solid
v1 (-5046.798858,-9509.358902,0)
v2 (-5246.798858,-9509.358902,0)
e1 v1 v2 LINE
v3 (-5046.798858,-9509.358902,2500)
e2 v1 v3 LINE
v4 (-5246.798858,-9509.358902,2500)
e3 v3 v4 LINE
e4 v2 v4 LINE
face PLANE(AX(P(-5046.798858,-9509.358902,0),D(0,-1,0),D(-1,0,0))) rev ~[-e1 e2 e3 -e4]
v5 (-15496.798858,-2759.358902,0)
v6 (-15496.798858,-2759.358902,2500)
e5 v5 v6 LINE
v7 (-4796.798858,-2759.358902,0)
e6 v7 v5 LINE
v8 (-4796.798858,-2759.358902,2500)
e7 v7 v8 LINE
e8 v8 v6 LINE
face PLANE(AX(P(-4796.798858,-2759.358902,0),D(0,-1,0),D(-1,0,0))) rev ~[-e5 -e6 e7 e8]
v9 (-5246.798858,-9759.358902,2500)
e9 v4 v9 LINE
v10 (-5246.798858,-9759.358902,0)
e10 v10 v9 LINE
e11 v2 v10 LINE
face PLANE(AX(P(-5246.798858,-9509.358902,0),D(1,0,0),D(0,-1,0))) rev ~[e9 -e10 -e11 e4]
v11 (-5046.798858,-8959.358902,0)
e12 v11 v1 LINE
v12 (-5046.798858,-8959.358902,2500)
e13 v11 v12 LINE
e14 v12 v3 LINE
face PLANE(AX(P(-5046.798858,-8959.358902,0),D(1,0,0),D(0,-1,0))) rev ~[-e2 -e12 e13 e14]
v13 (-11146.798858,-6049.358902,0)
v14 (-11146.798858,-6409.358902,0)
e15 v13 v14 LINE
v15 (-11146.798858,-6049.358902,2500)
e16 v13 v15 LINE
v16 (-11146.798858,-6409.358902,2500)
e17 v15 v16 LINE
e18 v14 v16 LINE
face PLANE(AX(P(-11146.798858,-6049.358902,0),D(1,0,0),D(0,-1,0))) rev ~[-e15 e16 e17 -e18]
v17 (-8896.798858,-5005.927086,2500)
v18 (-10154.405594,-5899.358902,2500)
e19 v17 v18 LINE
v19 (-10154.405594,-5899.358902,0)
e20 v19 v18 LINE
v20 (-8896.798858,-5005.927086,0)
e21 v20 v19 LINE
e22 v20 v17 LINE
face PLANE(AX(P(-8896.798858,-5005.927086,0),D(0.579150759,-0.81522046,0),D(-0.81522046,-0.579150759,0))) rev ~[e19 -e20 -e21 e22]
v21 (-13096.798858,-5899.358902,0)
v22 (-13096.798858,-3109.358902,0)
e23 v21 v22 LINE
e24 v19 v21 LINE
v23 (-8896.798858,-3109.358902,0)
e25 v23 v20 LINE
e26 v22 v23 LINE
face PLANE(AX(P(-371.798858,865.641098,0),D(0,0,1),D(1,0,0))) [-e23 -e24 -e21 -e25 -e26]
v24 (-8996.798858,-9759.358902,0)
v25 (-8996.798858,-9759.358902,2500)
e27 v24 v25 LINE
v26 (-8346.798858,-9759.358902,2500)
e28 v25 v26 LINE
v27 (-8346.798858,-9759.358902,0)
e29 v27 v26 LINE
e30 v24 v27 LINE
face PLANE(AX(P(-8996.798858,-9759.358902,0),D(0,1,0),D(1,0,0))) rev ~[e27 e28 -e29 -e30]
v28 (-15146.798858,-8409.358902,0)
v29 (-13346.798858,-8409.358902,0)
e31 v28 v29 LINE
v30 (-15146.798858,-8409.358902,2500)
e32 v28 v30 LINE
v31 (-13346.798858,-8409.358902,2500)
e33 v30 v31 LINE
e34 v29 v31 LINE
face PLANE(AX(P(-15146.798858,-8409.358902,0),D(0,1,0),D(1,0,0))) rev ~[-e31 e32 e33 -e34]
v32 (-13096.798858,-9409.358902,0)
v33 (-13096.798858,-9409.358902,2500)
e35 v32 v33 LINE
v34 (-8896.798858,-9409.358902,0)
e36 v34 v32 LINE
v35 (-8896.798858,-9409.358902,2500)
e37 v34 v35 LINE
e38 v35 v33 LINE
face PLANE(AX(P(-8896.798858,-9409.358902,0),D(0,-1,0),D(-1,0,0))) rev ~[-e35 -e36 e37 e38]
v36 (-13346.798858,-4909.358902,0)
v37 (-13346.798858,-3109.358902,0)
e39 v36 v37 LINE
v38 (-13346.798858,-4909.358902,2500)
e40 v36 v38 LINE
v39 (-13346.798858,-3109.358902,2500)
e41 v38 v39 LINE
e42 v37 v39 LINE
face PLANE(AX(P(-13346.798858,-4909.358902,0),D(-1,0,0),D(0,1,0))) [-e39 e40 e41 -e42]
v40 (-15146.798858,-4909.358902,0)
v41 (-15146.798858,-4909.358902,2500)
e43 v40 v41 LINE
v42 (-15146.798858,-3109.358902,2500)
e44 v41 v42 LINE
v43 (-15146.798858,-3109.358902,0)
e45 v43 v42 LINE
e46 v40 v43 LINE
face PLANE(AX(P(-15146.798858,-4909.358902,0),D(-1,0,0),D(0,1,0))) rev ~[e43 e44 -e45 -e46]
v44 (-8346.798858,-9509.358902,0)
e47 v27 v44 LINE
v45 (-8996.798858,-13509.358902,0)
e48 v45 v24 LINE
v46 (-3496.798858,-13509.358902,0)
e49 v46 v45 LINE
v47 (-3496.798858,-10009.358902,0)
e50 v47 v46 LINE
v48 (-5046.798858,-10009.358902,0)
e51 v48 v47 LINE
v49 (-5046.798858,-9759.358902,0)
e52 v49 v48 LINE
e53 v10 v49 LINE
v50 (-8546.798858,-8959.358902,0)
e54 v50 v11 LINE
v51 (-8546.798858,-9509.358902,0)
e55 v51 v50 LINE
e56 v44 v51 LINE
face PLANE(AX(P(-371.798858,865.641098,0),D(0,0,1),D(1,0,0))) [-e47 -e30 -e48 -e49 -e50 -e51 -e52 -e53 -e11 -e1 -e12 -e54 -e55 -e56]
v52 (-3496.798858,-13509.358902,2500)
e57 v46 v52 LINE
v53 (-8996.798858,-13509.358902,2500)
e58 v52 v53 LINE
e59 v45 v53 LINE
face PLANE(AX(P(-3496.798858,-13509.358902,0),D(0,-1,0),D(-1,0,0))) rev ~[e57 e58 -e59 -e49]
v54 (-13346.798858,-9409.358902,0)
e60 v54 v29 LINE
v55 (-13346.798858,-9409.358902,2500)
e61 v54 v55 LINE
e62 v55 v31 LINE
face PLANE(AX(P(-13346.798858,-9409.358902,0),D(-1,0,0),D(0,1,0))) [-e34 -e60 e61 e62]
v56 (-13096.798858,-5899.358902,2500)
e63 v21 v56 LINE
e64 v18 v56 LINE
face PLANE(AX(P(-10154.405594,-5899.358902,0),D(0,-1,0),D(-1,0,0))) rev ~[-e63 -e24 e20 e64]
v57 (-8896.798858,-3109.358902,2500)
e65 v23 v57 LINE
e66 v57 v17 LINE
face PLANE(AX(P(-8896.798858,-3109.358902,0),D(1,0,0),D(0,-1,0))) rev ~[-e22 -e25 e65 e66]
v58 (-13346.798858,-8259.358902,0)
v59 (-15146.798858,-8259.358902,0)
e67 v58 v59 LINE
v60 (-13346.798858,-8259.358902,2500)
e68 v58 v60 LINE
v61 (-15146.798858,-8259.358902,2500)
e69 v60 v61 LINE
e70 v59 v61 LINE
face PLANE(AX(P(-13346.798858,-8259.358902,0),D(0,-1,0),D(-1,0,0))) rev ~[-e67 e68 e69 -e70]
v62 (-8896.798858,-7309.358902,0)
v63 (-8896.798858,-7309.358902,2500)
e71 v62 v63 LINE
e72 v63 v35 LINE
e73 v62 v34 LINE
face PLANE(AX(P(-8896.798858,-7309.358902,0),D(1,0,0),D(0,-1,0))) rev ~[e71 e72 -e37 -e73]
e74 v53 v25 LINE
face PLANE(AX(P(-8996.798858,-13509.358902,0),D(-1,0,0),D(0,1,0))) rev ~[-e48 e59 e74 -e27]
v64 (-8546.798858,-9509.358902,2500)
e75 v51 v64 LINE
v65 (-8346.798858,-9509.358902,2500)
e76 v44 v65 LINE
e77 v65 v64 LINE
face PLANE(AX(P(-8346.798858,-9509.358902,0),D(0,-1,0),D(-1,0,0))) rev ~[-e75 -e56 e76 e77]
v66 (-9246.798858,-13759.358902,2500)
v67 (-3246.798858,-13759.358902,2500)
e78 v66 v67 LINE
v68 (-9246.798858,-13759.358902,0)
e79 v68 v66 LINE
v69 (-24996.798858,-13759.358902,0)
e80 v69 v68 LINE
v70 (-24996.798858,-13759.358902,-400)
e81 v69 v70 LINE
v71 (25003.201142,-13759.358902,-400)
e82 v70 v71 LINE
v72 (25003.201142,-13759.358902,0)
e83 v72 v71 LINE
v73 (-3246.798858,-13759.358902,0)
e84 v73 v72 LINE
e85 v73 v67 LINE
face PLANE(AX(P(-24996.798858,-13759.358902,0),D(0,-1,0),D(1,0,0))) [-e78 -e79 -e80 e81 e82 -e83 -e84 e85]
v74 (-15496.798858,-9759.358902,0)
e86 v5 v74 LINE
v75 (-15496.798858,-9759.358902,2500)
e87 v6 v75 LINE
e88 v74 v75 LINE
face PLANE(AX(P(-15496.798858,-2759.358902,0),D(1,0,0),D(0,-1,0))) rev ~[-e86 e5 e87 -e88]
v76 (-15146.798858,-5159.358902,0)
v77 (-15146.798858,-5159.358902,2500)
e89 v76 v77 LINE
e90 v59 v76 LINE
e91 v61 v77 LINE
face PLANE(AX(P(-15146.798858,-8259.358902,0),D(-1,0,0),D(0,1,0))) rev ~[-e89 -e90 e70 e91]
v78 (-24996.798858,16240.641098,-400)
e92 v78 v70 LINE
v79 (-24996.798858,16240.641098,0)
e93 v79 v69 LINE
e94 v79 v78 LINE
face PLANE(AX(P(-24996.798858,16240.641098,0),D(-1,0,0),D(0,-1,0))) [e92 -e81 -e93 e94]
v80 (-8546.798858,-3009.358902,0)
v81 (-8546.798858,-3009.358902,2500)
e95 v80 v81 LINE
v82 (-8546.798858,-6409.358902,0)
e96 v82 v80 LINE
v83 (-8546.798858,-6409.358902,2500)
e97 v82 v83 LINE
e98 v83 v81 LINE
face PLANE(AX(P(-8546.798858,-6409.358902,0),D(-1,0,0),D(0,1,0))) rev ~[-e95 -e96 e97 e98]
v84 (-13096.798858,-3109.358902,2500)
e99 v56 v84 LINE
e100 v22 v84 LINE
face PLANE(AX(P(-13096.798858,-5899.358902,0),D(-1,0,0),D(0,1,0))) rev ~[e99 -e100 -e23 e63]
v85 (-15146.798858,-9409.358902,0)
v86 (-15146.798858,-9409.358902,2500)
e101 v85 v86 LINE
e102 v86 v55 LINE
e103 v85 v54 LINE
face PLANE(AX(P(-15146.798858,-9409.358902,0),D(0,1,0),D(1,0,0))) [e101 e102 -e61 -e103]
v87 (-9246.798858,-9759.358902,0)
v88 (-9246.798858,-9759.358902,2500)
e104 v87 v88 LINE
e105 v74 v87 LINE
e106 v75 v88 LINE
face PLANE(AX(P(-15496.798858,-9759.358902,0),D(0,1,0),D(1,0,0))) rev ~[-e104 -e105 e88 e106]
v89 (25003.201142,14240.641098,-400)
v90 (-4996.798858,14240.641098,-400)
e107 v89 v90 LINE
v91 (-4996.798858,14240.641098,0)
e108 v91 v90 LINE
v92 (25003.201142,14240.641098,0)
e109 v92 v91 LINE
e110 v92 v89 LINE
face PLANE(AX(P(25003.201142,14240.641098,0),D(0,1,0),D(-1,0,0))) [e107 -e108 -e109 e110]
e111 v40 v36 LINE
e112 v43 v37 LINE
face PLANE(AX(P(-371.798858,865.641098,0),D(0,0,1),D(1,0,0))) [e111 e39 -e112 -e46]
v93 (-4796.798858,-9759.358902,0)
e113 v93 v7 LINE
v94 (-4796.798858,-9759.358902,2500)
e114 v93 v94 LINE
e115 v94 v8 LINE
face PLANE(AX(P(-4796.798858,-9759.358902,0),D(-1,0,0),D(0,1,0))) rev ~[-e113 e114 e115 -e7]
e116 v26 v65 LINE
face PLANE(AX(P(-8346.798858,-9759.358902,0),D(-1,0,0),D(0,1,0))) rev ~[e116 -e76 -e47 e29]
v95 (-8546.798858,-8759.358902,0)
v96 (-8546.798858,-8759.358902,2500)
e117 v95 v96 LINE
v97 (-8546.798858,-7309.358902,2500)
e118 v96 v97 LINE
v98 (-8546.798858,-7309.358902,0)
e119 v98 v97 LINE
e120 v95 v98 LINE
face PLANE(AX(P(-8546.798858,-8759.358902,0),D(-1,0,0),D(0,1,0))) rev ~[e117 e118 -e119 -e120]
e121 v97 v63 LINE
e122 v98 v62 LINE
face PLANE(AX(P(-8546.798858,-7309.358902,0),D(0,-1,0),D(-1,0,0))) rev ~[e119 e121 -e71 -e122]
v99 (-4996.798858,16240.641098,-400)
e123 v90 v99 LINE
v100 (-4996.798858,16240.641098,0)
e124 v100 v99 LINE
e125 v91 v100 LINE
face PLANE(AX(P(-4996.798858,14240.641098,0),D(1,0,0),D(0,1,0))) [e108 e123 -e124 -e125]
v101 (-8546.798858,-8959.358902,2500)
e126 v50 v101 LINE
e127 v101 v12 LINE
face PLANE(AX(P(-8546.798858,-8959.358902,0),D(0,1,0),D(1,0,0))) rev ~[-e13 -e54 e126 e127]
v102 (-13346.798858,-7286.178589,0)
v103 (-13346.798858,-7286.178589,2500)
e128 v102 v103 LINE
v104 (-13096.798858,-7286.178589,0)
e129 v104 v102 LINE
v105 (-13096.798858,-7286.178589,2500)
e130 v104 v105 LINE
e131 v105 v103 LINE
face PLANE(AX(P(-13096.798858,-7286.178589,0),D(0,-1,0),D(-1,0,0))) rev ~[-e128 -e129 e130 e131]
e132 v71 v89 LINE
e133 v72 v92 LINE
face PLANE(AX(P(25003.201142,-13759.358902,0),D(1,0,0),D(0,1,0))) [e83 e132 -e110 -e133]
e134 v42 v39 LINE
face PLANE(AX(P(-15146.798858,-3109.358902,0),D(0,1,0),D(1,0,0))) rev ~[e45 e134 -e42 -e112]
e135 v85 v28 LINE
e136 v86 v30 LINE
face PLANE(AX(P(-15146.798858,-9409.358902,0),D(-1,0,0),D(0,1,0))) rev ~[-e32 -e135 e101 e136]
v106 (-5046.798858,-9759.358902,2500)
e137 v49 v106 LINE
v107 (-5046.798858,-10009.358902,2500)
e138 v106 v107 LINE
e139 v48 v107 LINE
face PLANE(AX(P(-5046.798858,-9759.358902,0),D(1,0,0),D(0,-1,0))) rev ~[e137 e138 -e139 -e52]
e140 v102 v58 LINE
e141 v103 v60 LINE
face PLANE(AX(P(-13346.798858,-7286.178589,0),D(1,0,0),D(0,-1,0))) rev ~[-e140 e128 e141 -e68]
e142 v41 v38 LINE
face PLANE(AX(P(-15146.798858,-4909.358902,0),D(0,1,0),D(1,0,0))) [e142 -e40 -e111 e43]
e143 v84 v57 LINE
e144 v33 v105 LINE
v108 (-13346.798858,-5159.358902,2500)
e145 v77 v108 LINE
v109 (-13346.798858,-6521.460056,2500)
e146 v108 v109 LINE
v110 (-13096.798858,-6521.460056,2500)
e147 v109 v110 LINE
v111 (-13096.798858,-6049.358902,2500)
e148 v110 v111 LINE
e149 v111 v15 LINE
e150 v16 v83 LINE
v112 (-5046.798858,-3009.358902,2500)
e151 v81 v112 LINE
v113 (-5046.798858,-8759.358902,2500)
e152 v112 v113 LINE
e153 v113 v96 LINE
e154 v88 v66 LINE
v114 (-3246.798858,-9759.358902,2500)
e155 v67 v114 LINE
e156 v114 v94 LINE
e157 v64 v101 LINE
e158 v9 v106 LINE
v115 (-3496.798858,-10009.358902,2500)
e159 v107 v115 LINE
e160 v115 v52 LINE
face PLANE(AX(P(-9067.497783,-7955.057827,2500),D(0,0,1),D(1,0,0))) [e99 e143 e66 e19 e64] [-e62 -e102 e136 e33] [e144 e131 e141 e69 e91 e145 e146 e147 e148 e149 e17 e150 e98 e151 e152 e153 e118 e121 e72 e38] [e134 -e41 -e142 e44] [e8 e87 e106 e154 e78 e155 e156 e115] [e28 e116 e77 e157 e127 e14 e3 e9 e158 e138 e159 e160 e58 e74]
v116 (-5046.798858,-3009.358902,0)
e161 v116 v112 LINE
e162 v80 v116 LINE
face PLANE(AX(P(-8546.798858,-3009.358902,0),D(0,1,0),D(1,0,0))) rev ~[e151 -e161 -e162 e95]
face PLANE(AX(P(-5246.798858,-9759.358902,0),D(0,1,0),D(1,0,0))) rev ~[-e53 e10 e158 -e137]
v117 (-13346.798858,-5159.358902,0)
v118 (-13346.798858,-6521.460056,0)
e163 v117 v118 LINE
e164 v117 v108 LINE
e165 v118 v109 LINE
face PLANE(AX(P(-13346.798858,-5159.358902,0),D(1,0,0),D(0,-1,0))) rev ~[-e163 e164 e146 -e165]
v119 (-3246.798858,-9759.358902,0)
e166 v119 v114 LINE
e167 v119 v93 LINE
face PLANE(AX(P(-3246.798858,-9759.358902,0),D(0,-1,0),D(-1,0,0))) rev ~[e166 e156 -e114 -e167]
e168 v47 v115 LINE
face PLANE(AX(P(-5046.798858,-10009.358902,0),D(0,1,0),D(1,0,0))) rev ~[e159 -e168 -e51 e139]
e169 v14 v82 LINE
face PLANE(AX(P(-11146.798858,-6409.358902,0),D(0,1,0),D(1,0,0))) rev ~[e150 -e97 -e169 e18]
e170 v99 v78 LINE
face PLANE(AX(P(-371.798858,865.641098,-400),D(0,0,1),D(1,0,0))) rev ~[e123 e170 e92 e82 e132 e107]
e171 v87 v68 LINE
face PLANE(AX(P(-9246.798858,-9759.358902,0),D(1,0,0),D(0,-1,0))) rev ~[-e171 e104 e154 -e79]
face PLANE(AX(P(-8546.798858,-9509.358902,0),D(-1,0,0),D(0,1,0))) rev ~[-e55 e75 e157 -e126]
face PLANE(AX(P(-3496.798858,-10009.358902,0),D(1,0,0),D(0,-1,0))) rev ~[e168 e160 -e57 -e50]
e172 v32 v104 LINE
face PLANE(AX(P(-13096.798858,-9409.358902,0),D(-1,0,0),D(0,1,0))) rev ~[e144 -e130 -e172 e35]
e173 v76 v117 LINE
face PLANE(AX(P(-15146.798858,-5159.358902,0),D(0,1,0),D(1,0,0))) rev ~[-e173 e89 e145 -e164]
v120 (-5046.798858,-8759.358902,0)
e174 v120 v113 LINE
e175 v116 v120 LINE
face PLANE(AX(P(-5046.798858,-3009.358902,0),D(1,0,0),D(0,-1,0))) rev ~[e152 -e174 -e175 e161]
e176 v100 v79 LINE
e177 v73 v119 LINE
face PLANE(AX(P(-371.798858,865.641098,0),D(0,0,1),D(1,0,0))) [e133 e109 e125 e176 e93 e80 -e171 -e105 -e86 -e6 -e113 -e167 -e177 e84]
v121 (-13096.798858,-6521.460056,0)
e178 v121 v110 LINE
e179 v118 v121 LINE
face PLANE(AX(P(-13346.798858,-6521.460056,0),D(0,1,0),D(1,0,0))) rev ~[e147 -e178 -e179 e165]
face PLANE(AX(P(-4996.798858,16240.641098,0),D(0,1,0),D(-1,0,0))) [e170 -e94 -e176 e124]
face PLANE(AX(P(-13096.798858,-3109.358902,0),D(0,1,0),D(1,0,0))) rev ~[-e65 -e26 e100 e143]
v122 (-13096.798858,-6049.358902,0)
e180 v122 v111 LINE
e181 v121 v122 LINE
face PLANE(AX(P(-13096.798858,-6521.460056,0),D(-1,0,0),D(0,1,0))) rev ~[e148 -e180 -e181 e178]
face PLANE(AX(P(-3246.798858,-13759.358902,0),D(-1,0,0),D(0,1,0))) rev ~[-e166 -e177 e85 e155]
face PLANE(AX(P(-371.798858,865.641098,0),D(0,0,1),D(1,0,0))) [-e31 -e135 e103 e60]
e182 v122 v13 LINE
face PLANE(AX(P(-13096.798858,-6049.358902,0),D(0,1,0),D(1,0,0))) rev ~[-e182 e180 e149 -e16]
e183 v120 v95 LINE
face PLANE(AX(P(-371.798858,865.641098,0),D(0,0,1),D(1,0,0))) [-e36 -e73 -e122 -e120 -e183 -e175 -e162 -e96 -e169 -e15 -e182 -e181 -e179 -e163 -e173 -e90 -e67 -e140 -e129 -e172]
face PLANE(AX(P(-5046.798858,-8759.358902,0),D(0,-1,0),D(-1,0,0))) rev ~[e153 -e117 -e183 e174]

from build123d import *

# Parameters (mm, degrees)
F1_DEPTH = 400
F2_W     = 1800
F2_H     = 1000
F2_H_2   = 1800
F3_DEPTH = 2500


# Not quite as in the source:
# - a feature names something its author has since deleted; it is built from what else it names


with BuildPart() as f1:
    # F0 (on Top) → F1 (new body)
    with BuildSketch(Plane.XY):
        Polygon((-4996.7988580465, 16240.6410978539), (-24996.7988580465, 16240.6410978539), (-24996.7988580465, -13759.3589021461), (25003.2011419535, -13759.3589021461), (25003.2011419535, 14240.641097854), (-4996.7988580465, 14240.6410978539), align=None)
    extrude(amount=-F1_DEPTH)

    # F2 (on face) → F3 (join)
    with BuildSketch(Plane.XY):
        Polygon((-8546.7988580465, -2759.3589021461), (-15496.7988580465, -2759.3589021461), (-15496.7988580465, -9759.3589021461), (-9246.7988580465, -9759.3589021461), (-9246.7988580465, -13759.3589021461), (-3246.7988580465, -13759.3589021461), (-3246.7988580465, -9759.3589021461), (-4796.7988580465, -9759.3589021461), (-4796.7988580465, -3009.3589021461), (-4796.7988580465, -2759.3589021461), align=None)
        with Locations((-14246.7988580465, -8909.3589021461)):
            Rectangle(F2_W, F2_H, mode=Mode.SUBTRACT)
        Polygon((-8996.7988580465, -13509.3589021461), (-8996.7988580465, -9759.3589021461), (-8546.7988580465, -9759.3589021461), (-8346.7988580465, -9759.3589021461), (-8346.7988580465, -9509.3589021461), (-8546.7988580465, -9509.3589021461), (-8546.7988580465, -8959.3589021461), (-5046.7988580465, -8959.3589021461), (-5046.7988580465, -9509.3589021461), (-5246.7988580465, -9509.3589021461), (-5246.7988580465, -9759.3589021461), (-5046.7988580465, -9759.3589021461), (-5046.7988580465, -10009.3589021461), (-4796.7988580465, -10009.3589021461), (-3496.7988580465, -10009.3589021461), (-3496.7988580465, -13509.3589021461), align=None, mode=Mode.SUBTRACT)
        with Locations((-14246.7988580465, -4009.3589021461)):
            Rectangle(F2_W, F2_H_2, mode=Mode.SUBTRACT)
        Polygon((-8546.7988580465, -3009.3589021461), (-5046.7988580465, -3009.3589021461), (-5046.7988580465, -8759.3589021461), (-8546.7988580465, -8759.3589021461), (-8546.7988580465, -7309.3589021461), (-8896.7988580465, -7309.3589021461), (-8896.7988580465, -9409.3589021461), (-12196.7988580465, -9409.3589021461), (-13096.7988580465, -9409.3589021461), (-13096.7988580465, -8109.3589021461), (-13096.7988580465, -7286.1785888672), (-13346.7988580465, -7286.1785888672), (-13346.7988580465, -8259.3589021461), (-15146.7988580465, -8259.3589021461), (-15146.7988580465, -5159.3589021461), (-13346.7988580465, -5159.3589021461), (-13346.7988580465, -6521.4600563049), (-13096.7988580465, -6521.4600563049), (-13096.7988580465, -6049.3589021461), (-11146.7988580465, -6049.3589021461), (-11146.7988580465, -6409.3589021461), (-8896.7988580465, -6409.3589021461), (-8546.7988580465, -6409.3589021461), align=None, mode=Mode.SUBTRACT)
        Polygon((-8896.7988580465, -3109.3589021461), (-8896.7988580465, -5005.9270858765), (-10154.4055938721, -5899.3589021461), (-13096.7988580465, -5899.3589021461), (-13096.7988580465, -3109.3589021461), align=None, mode=Mode.SUBTRACT)
    extrude(amount=F3_DEPTH)


solid = f1.part
